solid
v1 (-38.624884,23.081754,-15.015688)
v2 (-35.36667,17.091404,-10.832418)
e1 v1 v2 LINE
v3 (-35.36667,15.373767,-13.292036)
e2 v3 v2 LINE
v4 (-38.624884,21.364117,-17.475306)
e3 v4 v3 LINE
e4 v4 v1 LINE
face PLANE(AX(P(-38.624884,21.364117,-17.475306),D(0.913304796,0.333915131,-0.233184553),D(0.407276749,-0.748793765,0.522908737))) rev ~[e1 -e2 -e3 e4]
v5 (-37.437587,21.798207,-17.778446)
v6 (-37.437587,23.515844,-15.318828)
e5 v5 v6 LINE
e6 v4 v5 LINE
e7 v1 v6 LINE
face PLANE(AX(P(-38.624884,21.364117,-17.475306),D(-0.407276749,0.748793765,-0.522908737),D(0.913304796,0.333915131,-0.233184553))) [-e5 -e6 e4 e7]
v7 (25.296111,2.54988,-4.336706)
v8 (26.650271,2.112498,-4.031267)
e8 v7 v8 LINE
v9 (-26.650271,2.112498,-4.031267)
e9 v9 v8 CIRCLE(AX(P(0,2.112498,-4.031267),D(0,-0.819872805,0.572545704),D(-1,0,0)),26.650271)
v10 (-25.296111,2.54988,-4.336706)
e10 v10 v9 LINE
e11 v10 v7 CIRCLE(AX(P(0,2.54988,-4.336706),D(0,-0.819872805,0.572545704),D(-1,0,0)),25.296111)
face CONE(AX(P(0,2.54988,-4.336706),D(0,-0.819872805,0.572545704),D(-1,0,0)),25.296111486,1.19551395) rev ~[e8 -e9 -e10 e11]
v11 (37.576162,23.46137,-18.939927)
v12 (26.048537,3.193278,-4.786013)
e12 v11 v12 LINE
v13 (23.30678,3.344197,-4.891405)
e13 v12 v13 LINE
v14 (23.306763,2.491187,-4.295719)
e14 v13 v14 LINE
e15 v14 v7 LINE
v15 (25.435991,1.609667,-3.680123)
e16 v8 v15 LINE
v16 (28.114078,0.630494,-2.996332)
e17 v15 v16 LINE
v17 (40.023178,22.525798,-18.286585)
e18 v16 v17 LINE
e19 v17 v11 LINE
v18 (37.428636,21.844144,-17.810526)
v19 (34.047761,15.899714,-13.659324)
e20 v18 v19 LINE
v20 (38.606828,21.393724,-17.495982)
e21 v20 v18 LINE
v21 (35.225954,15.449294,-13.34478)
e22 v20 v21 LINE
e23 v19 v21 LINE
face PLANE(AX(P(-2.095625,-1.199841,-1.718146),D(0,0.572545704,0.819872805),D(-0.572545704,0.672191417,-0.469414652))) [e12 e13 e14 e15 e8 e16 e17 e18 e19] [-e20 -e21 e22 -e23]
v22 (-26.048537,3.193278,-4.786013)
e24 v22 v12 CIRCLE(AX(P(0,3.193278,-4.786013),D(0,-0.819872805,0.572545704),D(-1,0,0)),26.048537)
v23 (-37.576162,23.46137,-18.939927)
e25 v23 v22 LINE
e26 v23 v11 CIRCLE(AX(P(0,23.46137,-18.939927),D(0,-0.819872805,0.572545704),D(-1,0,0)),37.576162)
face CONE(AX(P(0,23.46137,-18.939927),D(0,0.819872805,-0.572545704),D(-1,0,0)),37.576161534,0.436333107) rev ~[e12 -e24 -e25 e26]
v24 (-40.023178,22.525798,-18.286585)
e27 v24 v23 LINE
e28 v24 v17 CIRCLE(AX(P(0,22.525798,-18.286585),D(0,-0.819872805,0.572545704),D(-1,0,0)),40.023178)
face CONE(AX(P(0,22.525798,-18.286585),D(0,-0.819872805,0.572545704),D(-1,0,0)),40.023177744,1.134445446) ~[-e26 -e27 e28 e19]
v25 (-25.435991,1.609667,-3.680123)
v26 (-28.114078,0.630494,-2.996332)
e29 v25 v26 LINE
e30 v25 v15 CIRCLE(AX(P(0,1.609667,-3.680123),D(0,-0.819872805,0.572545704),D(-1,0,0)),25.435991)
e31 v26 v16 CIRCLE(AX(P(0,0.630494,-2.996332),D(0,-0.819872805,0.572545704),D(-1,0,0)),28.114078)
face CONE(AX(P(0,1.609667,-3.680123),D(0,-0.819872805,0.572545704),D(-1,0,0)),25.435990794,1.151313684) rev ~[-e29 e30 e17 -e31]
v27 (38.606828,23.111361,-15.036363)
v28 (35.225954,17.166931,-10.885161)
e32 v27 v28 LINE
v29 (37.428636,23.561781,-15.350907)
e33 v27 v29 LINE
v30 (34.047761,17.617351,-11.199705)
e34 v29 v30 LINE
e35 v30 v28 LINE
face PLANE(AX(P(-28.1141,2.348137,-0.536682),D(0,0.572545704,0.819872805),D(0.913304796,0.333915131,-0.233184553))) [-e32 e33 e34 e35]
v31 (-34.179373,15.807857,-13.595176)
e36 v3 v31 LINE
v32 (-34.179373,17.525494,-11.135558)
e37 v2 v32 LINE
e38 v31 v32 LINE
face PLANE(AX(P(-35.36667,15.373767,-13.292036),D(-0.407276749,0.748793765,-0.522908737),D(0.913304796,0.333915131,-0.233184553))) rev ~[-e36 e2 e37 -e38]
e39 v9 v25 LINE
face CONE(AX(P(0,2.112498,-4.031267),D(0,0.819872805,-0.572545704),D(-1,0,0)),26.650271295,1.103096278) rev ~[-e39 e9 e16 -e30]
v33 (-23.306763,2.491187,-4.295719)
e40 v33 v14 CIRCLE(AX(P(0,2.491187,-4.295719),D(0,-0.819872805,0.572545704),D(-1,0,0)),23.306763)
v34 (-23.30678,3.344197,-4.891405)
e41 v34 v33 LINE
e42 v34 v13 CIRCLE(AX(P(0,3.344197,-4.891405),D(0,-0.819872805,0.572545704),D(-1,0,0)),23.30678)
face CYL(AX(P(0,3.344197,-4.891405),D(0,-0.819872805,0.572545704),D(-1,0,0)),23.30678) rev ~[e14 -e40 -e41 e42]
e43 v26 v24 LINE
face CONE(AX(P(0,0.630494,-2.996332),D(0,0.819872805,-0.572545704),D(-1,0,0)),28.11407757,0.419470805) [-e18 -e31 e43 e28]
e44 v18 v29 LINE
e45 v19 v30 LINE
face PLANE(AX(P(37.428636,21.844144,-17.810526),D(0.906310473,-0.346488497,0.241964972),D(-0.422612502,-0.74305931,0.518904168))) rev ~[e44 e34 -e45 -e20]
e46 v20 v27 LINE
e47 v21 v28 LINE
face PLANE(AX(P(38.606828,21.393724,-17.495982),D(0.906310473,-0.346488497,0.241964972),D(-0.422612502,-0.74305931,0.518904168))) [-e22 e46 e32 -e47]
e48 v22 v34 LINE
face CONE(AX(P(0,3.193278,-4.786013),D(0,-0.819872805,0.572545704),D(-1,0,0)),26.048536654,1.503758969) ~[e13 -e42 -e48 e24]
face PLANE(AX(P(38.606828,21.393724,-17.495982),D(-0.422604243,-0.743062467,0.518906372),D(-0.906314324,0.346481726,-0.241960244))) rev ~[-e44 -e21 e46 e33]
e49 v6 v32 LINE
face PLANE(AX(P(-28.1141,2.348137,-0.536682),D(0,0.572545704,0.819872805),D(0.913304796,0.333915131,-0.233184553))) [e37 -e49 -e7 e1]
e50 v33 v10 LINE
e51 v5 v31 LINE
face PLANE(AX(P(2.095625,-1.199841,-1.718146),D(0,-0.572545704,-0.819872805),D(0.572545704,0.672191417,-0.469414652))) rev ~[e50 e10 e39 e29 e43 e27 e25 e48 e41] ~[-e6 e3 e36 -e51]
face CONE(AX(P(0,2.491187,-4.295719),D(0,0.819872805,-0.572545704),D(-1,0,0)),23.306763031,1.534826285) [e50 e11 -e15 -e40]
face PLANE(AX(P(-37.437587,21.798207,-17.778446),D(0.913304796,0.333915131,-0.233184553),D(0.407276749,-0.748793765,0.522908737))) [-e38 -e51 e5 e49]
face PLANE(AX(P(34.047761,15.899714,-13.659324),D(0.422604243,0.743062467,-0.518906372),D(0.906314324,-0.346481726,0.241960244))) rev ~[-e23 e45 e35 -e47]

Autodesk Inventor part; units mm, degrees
ref_plane "YZ Plane" through (0, 0, 0) normal (1, 0, 0) x (0, 1, 0)
ref_plane "XZ Plane" through (0, 0, 0) normal (0, 1, 0) x (-1, 0, 0)
ref_plane "XY Plane" through (0, 0, 0) normal (0, 0, 1) x (1, 0, 0)
sketch "Sketch68" plane through (0, 0, 0) normal (1, 0, 0) x (0, 1, 0)
  line L0 (1, 4.6737) -> (23, 4.6737) construction
  line L1 (7.0021, -2.9903) -> (-7.0029, -0.0135)
  line L2 (7.2385, 26.8729) -> (5.7713, 27.1847)
  line L3 (2.4565, 4.3755) -> (1, 4.6737)
  line L4 (5.7713, 27.1847) -> (1, 4.6737)
  line L5 (7.2385, 26.8729) -> (2.4565, 4.3755)
  point P0 (0, 0)
  point P1 (2.225, 5.1772)
sketch "Sketch184" plane through (0, 0, 0) normal (1, 0, 0) x (0, 1, 0)
  arc A0 (-3.5, -3.0972) -> (0, -1.6204) centre (-4.281, 3.6397) ccw
  arc A1 (0, -1.6204) -> (2.2822, 2) centre (-4.3557, 3.6547) ccw
  arc A2 (2.2822, 2) -> (2.459, 4.3851) centre (-8.8285, 4.0231) ccw
  arc A3 (2.459, 4.3851) -> (2.3883, 6) centre (-72.7121, 1.9029) ccw
  line L0 (-3.5, -3.0972) -> (-3.5, -3.6807) projected
  arc A4 (2.3883, 6) -> (-3.5, -3.0972) centre (8.6947, -4.5362) ccw
  point P0 (0, 0)
ref_plane "Work Plane13" through (-1.8188, 14.8649, 21.2051) normal (0, 0.8198728, -0.5725457) x (1, 0, 0)
sketch "Sketch199" plane through (-1.8188, 14.8649, 21.2051) normal (0, 0.8198728, -0.5725457) x (1, 0, 0)
  arc A0 (-4.7396, 24.5206) -> (-5.4434, 21.3285) centre (-1.0506, 22.0335) ccw
  arc A1 (-3, 27) -> (-4.7396, 24.5206) centre (12.4104, 14.3381) ccw
  arc A2 (-2.529, 32.2114) -> (-3, 27) centre (13.6873, 28.1188) ccw
  arc A3 (-1.0506, 33.1641) -> (-2.529, 32.2114) centre (-1.0598, 31.555) ccw
  line L0 (-1.0506, 33.1641) -> (5.2457, 33.1641)
  arc A4 (6.5345, 31.555) -> (5.2457, 33.1641) centre (3.9319, 30.7911) ccw
  arc A5 (8.0214, 23.5206) -> (6.5345, 31.555) centre (-50.214, 16.898) ccw
  arc A6 (3.9319, 18.2442) -> (8.0214, 23.5206) centre (2.6688, 23.4462) ccw
  arc A7 (-5.4434, 21.3285) -> (-2.264, 17.7532) centre (-1.0506, 22.0335) ccw
  arc A8 (-2.264, 17.7532) -> (3.9319, 18.2442) centre (-0.0763, 29.4839) ccw
  point P0 (1.8188, 25.8963)
ref_plane "Work Plane14" through (-1.8188, 14.8649, 21.2051) normal (0, 0.8198728, -0.5725457) x (1, 0, 0)
sketch "Sketch200" plane through (-1.8188, 14.8649, 21.2051) normal (0, 0.8198728, -0.5725457) x (1, 0, 0)
  arc A0 (-4.7396, 24.5206) -> (-5.4434, 21.3285) centre (-1.0506, 22.0335) ccw
  arc A1 (-3, 27) -> (-4.7396, 24.5206) centre (12.4104, 14.3381) ccw
  arc A2 (-2.529, 32.2114) -> (-3, 27) centre (13.6873, 28.1188) ccw
  arc A3 (-1.0506, 33.1641) -> (-2.529, 32.2114) centre (-1.0598, 31.555) ccw
  line L0 (-1.0506, 33.1641) -> (5.2457, 33.1641)
  arc A4 (6.5345, 31.555) -> (5.2457, 33.1641) centre (3.9319, 30.7911) ccw
  arc A5 (8.0214, 23.5206) -> (6.5345, 31.555) centre (-50.214, 16.898) ccw
  arc A6 (3.9319, 18.2442) -> (8.0214, 23.5206) centre (2.6688, 23.4462) ccw
  arc A7 (-5.4434, 21.3285) -> (-2.264, 17.7532) centre (-1.0506, 22.0335) ccw
  arc A8 (-2.264, 17.7532) -> (3.9319, 18.2442) centre (-0.0763, 29.4839) ccw
  point P0 (1.8188, 25.8963)
ref_plane "Work Plane15" through (-1.8188, 14.8649, 21.2051) normal (0, 0.8198728, -0.5725457) x (1, 0, 0)
sketch "Sketch201" plane through (-1.8188, 14.8649, 21.2051) normal (0, 0.8198728, -0.5725457) x (1, 0, 0)
  arc A0 (-4.7396, 24.5206) -> (-5.4434, 21.3285) centre (-1.0506, 22.0335) ccw
  arc A1 (-3, 27) -> (-4.7396, 24.5206) centre (12.4104, 14.3381) ccw
  arc A2 (-2.529, 32.2114) -> (-3, 27) centre (13.6873, 28.1188) ccw
  arc A3 (-1.0506, 33.1641) -> (-2.529, 32.2114) centre (-1.0598, 31.555) ccw
  line L0 (-1.0506, 33.1641) -> (5.2457, 33.1641)
  arc A4 (6.5345, 31.555) -> (5.2457, 33.1641) centre (3.9319, 30.7911) ccw
  arc A5 (8.0214, 23.5206) -> (6.5345, 31.555) centre (-50.214, 16.898) ccw
  arc A6 (3.9319, 18.2442) -> (8.0214, 23.5206) centre (2.6688, 23.4462) ccw
  arc A7 (-2.264, 17.7532) -> (3.9319, 18.2442) centre (-0.0763, 29.4839) ccw
  arc A8 (-5.4434, 21.3285) -> (-2.264, 17.7532) centre (-1.0506, 22.0335) ccw
  arc A9 (-4.7396, 24.5206) -> (-5.4434, 21.3285) centre (-1.0506, 22.0335) ccw
  arc A10 (-3, 27) -> (-4.7396, 24.5206) centre (12.4104, 14.3381) ccw
  arc A11 (-2.529, 32.2114) -> (-3, 27) centre (13.6873, 28.1188) ccw
  arc A12 (-1.0506, 33.1641) -> (-2.529, 32.2114) centre (-1.0598, 31.555) ccw
  line L1 (-1.0506, 33.1641) -> (5.2457, 33.1641)
  arc A13 (6.5345, 31.555) -> (5.2457, 33.1641) centre (3.9319, 30.7911) ccw
  arc A14 (8.0214, 23.5206) -> (6.5345, 31.555) centre (-50.214, 16.898) ccw
  arc A15 (3.9319, 18.2442) -> (8.0214, 23.5206) centre (2.6688, 23.4462) ccw
  arc A16 (-2.264, 17.7532) -> (3.9319, 18.2442) centre (-0.0763, 29.4839) ccw
  arc A17 (-5.4434, 21.3285) -> (-2.264, 17.7532) centre (-1.0506, 22.0335) ccw
  arc A18 (-4.7396, 24.5206) -> (-5.4434, 21.3285) centre (-1.0506, 22.0335) ccw
  arc A19 (-3, 27) -> (-4.7396, 24.5206) centre (12.4104, 14.3381) ccw
  arc A20 (-2.529, 32.2114) -> (-3, 27) centre (13.6873, 28.1188) ccw
  arc A21 (-1.0506, 33.1641) -> (-2.529, 32.2114) centre (-1.0598, 31.555) ccw
  line L2 (-1.0506, 33.1641) -> (5.2457, 33.1641)
  arc A22 (6.5345, 31.555) -> (5.2457, 33.1641) centre (3.9319, 30.7911) ccw
  arc A23 (8.0214, 23.5206) -> (6.5345, 31.555) centre (-50.214, 16.898) ccw
  arc A24 (3.9319, 18.2442) -> (8.0214, 23.5206) centre (2.6688, 23.4462) ccw
  arc A25 (-2.264, 17.7532) -> (3.9319, 18.2442) centre (-0.0763, 29.4839) ccw
  arc A26 (-5.4434, 21.3285) -> (-2.264, 17.7532) centre (-1.0506, 22.0335) ccw
  arc A27 (-2.529, 32.2114) -> (-3, 27) centre (13.6873, 28.1188) ccw
  arc A28 (-3, 27) -> (-4.7396, 24.5206) centre (12.4104, 14.3381) ccw
  arc A29 (-4.7396, 24.5206) -> (-5.4434, 21.3285) centre (-1.0506, 22.0335) ccw
  arc A30 (-5.4434, 21.3285) -> (-2.264, 17.7532) centre (-1.0506, 22.0335) ccw
  arc A31 (-2.264, 17.7532) -> (3.9319, 18.2442) centre (-0.0763, 29.4839) ccw
  arc A32 (3.9319, 18.2442) -> (8.0214, 23.5206) centre (2.6688, 23.4462) ccw
  arc A33 (8.0214, 23.5206) -> (6.5345, 31.555) centre (-50.214, 16.898) ccw
  arc A34 (6.5345, 31.555) -> (5.2457, 33.1641) centre (3.9319, 30.7911) ccw
  line L3 (-1.0506, 33.1641) -> (5.2457, 33.1641)
  arc A35 (-1.0506, 33.1641) -> (-2.529, 32.2114) centre (-1.0598, 31.555) ccw
  arc A36 (-3.4348, 34.2537) -> (-4, 28) centre (16.0247, 29.3425) ccw
  arc A37 (-4, 28) -> (-6.0875, 25.0247) centre (14.4925, 12.8057) ccw
  arc A38 (-3.1168, 16.9038) -> (4.3183, 17.4931) centre (-0.4915, 30.9807) ccw
  arc A39 (4.3183, 17.4931) -> (9.2257, 23.8247) centre (2.8025, 23.7355) ccw
  arc A40 (9.2257, 23.8247) -> (7.4414, 33.4659) centre (-60.6567, 15.8776) ccw
  arc A41 (7.4414, 33.4659) -> (5.8948, 35.3969) centre (4.3183, 32.5493) ccw
  line L4 (-1.6607, 35.3969) -> (5.8948, 35.3969)
  arc A42 (-1.6607, 35.3969) -> (-3.4348, 34.2537) centre (-1.6718, 33.4659) ccw
  arc A43 (-6.0875, 25.0247) -> (-6.9321, 21.1943) centre (-1.6607, 22.0403) ccw
  arc A44 (-6.9321, 21.1943) -> (-3.1168, 16.9038) centre (-1.6607, 22.0403) ccw
  point P0 (1.8188, 25.8963)
sketch "Sketch213" plane through (0, 0, 0) normal (1, 0, 0) x (0, 1, 0)
  line L0 (13.3414, -11.8728) -> (-10.8201, 5)
  line L1 (46.9769, 13.1952) -> (16.4024, 18.5466)
  line L2 (-15.4661, -26.0463) -> (-0.3893, -51.1005)
  line L3 (-0.3893, -51.1005) -> (1.9473, -49.7476)
  line L4 (46.9769, 13.1952) -> (46.7355, 11.8161)
  line L5 (1.9473, -49.7476) -> (-11.7207, -26.1425)
  line L6 (-11.7207, -26.1425) -> (-10, -24)
  line L7 (-10, -24) -> (-10.853, -23.4043)
  line L8 (46.7355, 11.8161) -> (18.2275, 16.8059)
  line L9 (18.2275, 16.8059) -> (17, 15)
  line L10 (17, 15) -> (16.3637, 15.4444)
  line L11 (16.3637, 15.4444) -> (17.062, 16.4444)
  line L12 (17.062, 16.4444) -> (17.3561, 17.7094)
  line L13 (17.3561, 17.7094) -> (16.3637, 17.6698)
  line L14 (16.3637, 17.6698) -> (16.4024, 18.5466)
  line L15 (-10.853, -23.4043) -> (-11.9333, -25.0763)
  line L16 (-11.9333, -25.0763) -> (-13.146, -25.8811)
  line L17 (-13.146, -25.8811) -> (-12.9536, -24.5344)
  line L18 (-12.9536, -24.5344) -> (-15.4661, -26.0463)
  point P0 (0, 0)
  point P1 (3.3399, -2.2736)
  point P2 (-1.2043, -8.7808)
  dimension "d600" = 2.7
  dimension "d601" = 1.4
  dimension "d603" = 1.265
revolve "Revolution6" add sketch "Sketch213" angle 180 mid plane about axis through (0, 13.3414, -11.8728) along (0, -0.8198728, 0.5725457) contours L18 L17 L16 L15 L7 L6 L5 L3 L2
sketch "Sketch214" plane through (-28.1141, 0.6305, -2.9963) normal (0, 0.5725457, 0.8198728) x (0.9133048, 0.3339151, -0.2331846)
  line L0 (71.2508, -4.0445) -> (70.3985, -3.0629)
  line L1 (70.3985, -3.0629) -> (64.3578, -8.3078)
  line L2 (71.2508, -4.0445) -> (65.2101, -9.2894)
  line L3 (64.3578, -8.3078) -> (65.2101, -9.2894)
  line L4 (2.6996, 29.2863) -> (0, 29.2408) projected
  line L5 (3.1595, 2.0136) -> (2.6996, 29.2863) projected
  line L6 (0, 29.2408) -> (0, 0) projected
  line L7 (0.7, 27.3772) -> (2, 27.3772)
  line L8 (0.7, 27.3772) -> (0.7, 19.3772)
  line L9 (2, 27.3772) -> (2, 19.3772)
  line L10 (0.7, 19.3772) -> (2, 19.3772)
  line L11 (51.3534, -22.9004) -> (73.1067, -3.3602) projected
  line L12 (73.1067, -3.3602) -> (71.3365, -1.3215) projected
  line L13 (71.3365, -1.3215) -> (50.7401, -19.2043) projected
  point P0 (24.7675, -13.4891)
  dimension "d606" = 8
  dimension "d625" = 90
  dimension "d626" = 0.7
  dimension "d630" = 1.3
  dimension "d635" = 0.7
  dimension "d637" = 1.85
extrude "Extrusion162" add sketch "Sketch214" along normal blind 3
properties part number "A1_V1_M2_dropArm_WOK_meso_tall_VIS_rt"
